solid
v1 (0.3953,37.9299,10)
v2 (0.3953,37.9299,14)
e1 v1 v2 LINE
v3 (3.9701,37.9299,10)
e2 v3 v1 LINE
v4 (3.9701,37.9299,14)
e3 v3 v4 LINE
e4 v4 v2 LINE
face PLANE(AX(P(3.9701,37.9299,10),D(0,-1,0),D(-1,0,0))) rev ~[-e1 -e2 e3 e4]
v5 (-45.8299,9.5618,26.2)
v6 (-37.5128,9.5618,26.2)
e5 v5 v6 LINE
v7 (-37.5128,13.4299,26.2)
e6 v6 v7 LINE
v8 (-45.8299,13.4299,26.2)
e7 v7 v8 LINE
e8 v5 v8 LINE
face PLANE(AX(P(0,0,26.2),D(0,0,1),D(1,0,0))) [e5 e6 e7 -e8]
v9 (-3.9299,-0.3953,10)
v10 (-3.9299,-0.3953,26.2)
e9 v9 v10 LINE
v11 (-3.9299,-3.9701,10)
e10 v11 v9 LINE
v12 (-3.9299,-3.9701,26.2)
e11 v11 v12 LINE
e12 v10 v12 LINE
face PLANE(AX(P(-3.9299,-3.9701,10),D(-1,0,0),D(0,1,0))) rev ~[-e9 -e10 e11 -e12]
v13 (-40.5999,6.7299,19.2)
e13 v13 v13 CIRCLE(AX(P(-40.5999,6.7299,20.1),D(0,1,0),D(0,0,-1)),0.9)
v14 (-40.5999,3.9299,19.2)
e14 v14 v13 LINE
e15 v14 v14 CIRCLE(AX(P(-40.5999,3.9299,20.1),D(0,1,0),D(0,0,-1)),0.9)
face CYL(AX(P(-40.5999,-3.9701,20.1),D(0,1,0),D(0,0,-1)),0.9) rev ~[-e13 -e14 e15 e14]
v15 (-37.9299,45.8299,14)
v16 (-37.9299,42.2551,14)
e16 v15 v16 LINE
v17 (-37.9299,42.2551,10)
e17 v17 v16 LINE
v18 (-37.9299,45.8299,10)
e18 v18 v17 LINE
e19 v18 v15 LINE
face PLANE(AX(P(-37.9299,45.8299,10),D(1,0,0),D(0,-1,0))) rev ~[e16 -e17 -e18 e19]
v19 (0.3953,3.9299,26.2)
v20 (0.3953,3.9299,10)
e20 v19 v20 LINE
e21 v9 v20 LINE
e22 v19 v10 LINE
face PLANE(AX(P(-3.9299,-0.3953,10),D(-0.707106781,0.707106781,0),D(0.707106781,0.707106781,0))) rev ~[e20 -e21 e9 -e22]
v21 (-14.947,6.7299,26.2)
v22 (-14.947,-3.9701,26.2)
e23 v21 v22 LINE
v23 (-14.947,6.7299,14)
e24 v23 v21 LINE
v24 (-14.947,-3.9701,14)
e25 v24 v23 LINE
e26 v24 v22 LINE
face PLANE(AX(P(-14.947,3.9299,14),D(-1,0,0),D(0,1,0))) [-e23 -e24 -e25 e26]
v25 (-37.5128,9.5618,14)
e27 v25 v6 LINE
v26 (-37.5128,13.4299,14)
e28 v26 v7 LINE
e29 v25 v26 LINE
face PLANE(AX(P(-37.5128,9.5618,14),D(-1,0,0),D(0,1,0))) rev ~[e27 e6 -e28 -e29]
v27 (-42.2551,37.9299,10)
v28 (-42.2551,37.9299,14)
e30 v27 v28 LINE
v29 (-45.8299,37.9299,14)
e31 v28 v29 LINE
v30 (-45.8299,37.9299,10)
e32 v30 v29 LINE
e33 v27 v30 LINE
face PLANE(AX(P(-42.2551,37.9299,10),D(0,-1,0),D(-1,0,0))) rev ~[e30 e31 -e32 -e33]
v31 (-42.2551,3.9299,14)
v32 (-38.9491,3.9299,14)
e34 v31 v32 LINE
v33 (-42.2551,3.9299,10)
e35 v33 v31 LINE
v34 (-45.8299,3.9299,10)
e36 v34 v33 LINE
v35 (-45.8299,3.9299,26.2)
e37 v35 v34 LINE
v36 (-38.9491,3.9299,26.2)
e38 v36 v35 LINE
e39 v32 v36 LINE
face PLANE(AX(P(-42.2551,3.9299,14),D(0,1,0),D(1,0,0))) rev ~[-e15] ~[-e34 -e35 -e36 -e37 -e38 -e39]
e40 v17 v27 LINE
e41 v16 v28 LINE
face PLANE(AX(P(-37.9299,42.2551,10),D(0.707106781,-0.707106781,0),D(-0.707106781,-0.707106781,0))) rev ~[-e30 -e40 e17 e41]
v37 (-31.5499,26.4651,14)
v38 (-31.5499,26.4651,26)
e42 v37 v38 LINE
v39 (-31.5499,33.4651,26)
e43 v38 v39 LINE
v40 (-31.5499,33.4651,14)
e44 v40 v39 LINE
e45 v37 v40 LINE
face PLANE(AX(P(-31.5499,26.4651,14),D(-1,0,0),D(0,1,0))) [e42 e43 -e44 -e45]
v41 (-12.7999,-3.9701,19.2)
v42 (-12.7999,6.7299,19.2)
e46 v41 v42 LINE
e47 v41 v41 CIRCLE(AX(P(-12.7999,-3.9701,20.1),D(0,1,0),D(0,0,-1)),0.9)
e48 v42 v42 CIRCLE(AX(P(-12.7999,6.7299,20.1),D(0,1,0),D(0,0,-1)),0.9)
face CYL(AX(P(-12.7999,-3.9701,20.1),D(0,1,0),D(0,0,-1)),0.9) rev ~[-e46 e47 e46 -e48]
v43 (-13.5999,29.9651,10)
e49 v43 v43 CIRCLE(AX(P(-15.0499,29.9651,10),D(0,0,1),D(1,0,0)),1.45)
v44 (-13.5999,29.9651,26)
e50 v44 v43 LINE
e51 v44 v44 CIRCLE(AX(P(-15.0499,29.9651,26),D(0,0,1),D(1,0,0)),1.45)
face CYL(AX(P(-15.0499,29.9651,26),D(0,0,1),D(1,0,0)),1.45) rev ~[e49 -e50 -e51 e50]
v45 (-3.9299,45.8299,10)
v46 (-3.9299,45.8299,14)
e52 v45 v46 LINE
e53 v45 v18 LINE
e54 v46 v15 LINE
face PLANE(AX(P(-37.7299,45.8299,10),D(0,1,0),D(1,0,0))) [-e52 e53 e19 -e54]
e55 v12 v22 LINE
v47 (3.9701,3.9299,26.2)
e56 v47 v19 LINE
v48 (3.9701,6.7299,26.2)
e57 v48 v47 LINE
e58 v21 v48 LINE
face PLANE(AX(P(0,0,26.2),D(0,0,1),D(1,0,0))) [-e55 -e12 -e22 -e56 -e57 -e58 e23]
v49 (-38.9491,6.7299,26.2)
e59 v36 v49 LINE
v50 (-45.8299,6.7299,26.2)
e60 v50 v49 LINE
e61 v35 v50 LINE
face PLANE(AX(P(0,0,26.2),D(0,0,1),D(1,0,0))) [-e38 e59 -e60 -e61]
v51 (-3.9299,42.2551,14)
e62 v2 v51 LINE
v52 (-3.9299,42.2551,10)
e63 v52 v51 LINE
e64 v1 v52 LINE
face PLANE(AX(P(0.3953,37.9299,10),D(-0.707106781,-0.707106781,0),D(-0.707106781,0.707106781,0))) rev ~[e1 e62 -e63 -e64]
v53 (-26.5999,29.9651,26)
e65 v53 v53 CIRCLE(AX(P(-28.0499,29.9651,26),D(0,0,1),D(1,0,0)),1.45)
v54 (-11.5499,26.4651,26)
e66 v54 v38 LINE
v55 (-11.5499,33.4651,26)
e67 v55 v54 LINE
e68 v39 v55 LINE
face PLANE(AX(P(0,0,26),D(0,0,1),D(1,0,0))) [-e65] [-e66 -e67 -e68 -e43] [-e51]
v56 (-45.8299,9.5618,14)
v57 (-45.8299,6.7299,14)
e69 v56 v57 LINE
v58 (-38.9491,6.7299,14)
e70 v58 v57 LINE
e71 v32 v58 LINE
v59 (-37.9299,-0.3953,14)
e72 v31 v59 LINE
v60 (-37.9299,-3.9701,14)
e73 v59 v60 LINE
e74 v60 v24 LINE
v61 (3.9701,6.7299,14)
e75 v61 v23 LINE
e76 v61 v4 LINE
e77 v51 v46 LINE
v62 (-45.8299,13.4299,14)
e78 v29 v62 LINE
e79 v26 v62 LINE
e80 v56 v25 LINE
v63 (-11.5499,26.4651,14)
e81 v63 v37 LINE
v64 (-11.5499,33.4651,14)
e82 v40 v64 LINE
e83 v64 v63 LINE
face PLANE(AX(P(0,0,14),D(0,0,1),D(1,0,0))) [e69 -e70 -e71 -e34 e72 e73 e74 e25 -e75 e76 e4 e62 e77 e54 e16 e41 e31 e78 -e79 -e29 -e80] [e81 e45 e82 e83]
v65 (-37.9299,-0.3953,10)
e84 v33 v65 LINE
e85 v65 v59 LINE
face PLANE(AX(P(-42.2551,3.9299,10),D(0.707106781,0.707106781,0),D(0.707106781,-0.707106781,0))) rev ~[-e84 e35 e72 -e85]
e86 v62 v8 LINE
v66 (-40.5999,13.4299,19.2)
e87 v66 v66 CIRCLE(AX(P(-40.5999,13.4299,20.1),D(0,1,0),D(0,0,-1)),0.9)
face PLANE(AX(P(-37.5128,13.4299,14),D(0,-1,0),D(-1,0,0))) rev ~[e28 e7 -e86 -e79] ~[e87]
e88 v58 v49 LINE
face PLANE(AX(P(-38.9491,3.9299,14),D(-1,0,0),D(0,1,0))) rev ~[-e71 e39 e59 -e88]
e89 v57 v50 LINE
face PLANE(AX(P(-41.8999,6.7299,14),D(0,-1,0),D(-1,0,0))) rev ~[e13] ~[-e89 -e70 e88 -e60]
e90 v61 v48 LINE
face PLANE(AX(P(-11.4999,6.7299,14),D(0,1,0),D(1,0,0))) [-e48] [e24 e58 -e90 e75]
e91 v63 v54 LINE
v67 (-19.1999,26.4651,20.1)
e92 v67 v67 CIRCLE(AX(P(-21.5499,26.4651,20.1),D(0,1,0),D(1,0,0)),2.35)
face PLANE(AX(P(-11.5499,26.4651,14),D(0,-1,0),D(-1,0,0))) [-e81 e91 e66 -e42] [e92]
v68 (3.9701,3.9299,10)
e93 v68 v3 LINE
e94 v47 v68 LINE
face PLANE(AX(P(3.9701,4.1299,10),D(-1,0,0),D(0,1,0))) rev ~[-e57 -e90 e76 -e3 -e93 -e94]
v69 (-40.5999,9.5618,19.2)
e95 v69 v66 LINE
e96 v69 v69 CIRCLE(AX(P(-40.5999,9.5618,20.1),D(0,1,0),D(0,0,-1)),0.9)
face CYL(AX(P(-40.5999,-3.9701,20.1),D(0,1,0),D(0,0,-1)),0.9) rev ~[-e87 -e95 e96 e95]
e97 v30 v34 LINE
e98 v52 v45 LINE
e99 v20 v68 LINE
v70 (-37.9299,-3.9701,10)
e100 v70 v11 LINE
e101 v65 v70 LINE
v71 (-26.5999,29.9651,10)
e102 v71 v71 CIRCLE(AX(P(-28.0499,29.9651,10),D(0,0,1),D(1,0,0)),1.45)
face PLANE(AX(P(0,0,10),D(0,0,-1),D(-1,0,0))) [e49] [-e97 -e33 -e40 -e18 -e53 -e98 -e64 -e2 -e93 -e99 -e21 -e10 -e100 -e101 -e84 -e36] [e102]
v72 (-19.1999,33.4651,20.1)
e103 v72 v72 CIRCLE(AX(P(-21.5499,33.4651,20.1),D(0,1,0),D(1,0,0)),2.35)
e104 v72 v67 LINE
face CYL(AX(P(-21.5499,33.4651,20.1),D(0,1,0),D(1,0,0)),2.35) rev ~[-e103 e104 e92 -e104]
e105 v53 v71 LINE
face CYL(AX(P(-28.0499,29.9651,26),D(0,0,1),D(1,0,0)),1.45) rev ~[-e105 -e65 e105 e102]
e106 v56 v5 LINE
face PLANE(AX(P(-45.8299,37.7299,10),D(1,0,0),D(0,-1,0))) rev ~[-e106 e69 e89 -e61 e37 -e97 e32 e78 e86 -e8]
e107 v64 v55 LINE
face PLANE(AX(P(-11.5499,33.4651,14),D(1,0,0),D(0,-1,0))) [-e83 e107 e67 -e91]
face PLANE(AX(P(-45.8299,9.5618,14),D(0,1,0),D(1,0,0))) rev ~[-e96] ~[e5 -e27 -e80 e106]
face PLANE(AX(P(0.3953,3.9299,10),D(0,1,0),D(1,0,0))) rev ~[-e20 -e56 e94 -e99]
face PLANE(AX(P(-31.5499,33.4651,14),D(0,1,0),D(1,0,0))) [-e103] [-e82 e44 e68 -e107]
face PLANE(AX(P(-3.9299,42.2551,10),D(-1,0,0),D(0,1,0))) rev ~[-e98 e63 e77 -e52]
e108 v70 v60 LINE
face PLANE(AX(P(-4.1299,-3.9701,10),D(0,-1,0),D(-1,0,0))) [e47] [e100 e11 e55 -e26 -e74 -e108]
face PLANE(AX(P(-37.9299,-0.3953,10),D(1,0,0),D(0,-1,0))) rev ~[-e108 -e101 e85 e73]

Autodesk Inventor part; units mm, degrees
ref_plane "YZ Plane" through (0, 0, 0) normal (1, 0, 0) x (0, 1, 0)
ref_plane "Work Plane1" through (0, 0, 10) normal (0, 0, 1) x (1, 0, 0)
sketch "Sketch1" plane through (0, 0, 10) normal (0, 0, 1) x (1, 0, 0)
  line L0 (-4.0299, -0.3538) -> (-2.2322, 1.4439) construction
  arc A0 (-1.4439, 2.2322) -> (-2.2322, 1.4439) centre (-0.9299, 0.9299) ccw construction
  line L1 (-1.4439, 2.2322) -> (0.3538, 4.0299) construction
  line L2 (-37.8299, 42.2137) -> (-37.8299, 45.8299) construction
  line L3 (-37.8299, 45.8299) -> (-4.0299, 45.8299) construction
  line L4 (-4.0299, 45.8299) -> (-4.0299, 42.2137) construction
  line L5 (-4.0299, 4.0299) -> (0.3538, 4.0299) projected
  circle A1 centre (-20.9299, 20.9299) radius 17.5 construction
  line L6 (-20.9299, 58.9723) -> (17.1124, 20.9299) construction
  line L7 (17.1124, 20.9299) -> (-20.9299, -17.1124) construction
  line L8 (-20.9299, -17.1124) -> (-58.9723, 20.9299) construction
  line L9 (-58.9723, 20.9299) -> (-20.9299, 58.9723) construction
  line L10 (-20.9299, 58.9723) -> (-20.9299, -17.1124) construction
  line L11 (17.1124, 20.9299) -> (-58.9723, 20.9299) construction
  line L12 (-20.9299, 58.9723) -> (32.8701, 58.9723) construction
  line L13 (-43.2198, 43.4299) -> (1.7802, 43.4299) construction
  line L14 (1.7802, 43.4299) -> (1.7802, -1.5701) construction
  line L15 (1.7802, -1.5701) -> (-43.2198, -1.5701) construction
  line L16 (-43.2198, -1.5701) -> (-43.2198, 43.4299) construction
  line L17 (-43.2198, 5.1774) -> (-43.2198, 36.6824)
  line L18 (-43.2198, 36.6824) -> (-36.4723, 43.4299)
  line L19 (-36.4723, 43.4299) -> (-5.3876, 43.4299)
  line L20 (-5.3876, 43.4299) -> (1.7802, 36.2621)
  line L21 (1.7802, 36.2621) -> (1.7802, 5.5977)
  line L22 (1.7802, 5.5977) -> (-5.3876, -1.5701)
  line L23 (-5.3876, -1.5701) -> (-36.4723, -1.5701)
  line L24 (-36.4723, -1.5701) -> (-43.2198, 5.1774)
  line L25 (-4.0299, 42.2137) -> (-37.8299, 42.2137) projected
  line L26 (-4.0299, -0.3538) -> (-4.0299, 4.0299) projected
  circle A2 centre (-20.7198, 20.9299) radius 7.0417 construction
  arc A3 (-7.3745, 3.5) -> (-34.4854, 3.5) centre (-20.9299, 0) ccw construction
  arc A4 (-11.4668, 9.7661) -> (-30.4087, 10.1422) centre (-20.7198, 20.9299) ccw
  line L27 (-30.5806, 10.1422) -> (-30.4087, 10.1422)
  line L28 (-30.4087, 10.1422) -> (-30.4087, 1.6029)
  line L29 (-30.4087, 1.6029) -> (-11.4668, 1.6029)
  line L30 (-11.4668, 1.6029) -> (-11.4668, 9.7661)
  line L31 (-43.2198, 43.4299) -> (-10.4667, 10.6769) construction
  line L32 (-8.5595, 8.5517) -> (1.7802, -1.5701) construction
  line L33 (1.7802, 43.4299) -> (-25.699, 15.9507) construction
  line L34 (-30.9728, 10.6769) -> (-43.2198, -1.5701) construction
  point P0 (-37.8299, 4.0299)
  dimension "d18" = 53.8
  dimension "d19" = 45
  dimension "d20" = 53.8
  dimension "d21" = 45
  dimension "d22" = 45
  dimension "d68" = 29
extrude "Extrusion1" add sketch "Sketch1" along normal blind 4 contours L26 L22 L23 L24 L17 L18 L25 L20 L21 L5 | L5 L22 L26 | L25 L18 L19 L20 | L30 L29 L28 A4
sketch "Sketch3" plane through (0, 0, 10) normal (0, 0, -1) x (-1, 0, 0)
  line L0 (37.8299, -0.4701) -> (37.8299, 4.0299) construction
  line L1 (4.0299, 4.0299) -> (4.0299, -0.4701) construction
  line L2 (37.8299, -0.4701) -> (37.8299, 1.1886) construction
  line L3 (4.0299, -3.9701) -> (4.0299, -0.3538) construction
  line L4 (45.8299, 4.0299) -> (42.2137, 4.0299) construction
  line L5 (-0.3538, 4.0299) -> (-3.9701, 4.0299) construction
  line L6 (-3.9701, 37.8299) -> (-0.3538, 37.8299) construction
  line L7 (4.0299, 42.2137) -> (4.0299, 45.8299) construction
  line L8 (37.8299, 45.8299) -> (37.8299, 42.2137) construction
  line L9 (42.2137, 37.8299) -> (45.8299, 37.8299) construction
  line L10 (37.8299, 37.7299) -> (45.8299, 37.7299)
  line L11 (45.8299, 37.7299) -> (45.8299, 4.1299)
  line L12 (45.8299, 4.1299) -> (37.8299, 4.1299)
  line L13 (37.8299, 4.1299) -> (37.8299, 37.7299)
  line L14 (37.7299, 4.0299) -> (4.1299, 4.0299)
  line L15 (4.1299, 4.0299) -> (4.1299, -3.9701)
  line L16 (4.1299, -3.9701) -> (37.7299, -3.9701)
  line L17 (37.7299, -3.9701) -> (37.7299, 4.0299)
  line L18 (4.0299, 4.1299) -> (-3.9701, 4.1299)
  line L19 (-3.9701, 4.1299) -> (-3.9701, 37.7299)
  line L20 (-3.9701, 37.7299) -> (4.0299, 37.7299)
  line L21 (4.0299, 37.7299) -> (4.0299, 4.1299)
  line L22 (4.1299, 37.8299) -> (37.7299, 37.8299)
  line L23 (37.7299, 37.8299) -> (37.7299, 45.8299)
  line L24 (37.7299, 45.8299) -> (4.1299, 45.8299)
  line L25 (4.1299, 45.8299) -> (4.1299, 37.8299)
  point P0 (0, 0)
  dimension "d23" = 0.1
  dimension "d24" = 0.1
  dimension "d25" = 0.1
  dimension "d26" = 0.1
  dimension "d27" = 0.1
extrude "Extrusion3" add sketch "Sketch3" against normal up to surface (4 mm away)
sketch "Skizze12" plane through (0, 0, 10) normal (0, 0, -1) x (-1, 0, 0)
  line L0 (-0.3124, 4.1299) -> (4.1299, -0.3124) projected
  line L1 (4.1299, -0.3124) -> (4.1299, -3.9701) projected
  line L2 (4.1299, -3.9701) -> (37.7299, -3.9701) construction
  line L3 (37.7299, -3.9701) -> (37.7299, -0.3124) projected
  line L4 (37.7299, -0.3124) -> (42.1723, 4.1299) projected
  line L5 (45.8299, 4.1299) -> (42.1723, 4.1299) projected
  line L6 (45.8299, 37.7299) -> (45.8299, 4.1299) construction
  line L7 (42.1723, 37.7299) -> (45.8299, 37.7299) projected
  line L8 (42.1723, 37.7299) -> (37.7299, 42.1723) projected
  line L9 (37.7299, 42.1723) -> (37.7299, 45.8299) projected
  line L10 (37.7299, 45.8299) -> (4.1299, 45.8299) construction
  line L11 (4.1299, 45.8299) -> (4.1299, 42.1723) projected
  line L12 (4.1299, 42.1723) -> (-0.3124, 37.7299) projected
  line L13 (-3.9701, 37.7299) -> (-0.3124, 37.7299) projected
  line L14 (-3.9701, 4.1299) -> (-3.9701, 37.7299) construction
  line L15 (-0.3124, 4.1299) -> (-3.9701, 4.1299) projected
  line L16 (37.9299, -4.1701) -> (3.9299, -4.1701) construction
  line L17 (3.9299, -4.1701) -> (3.9299, -0.3953)
  line L18 (3.9299, -0.3953) -> (-0.3953, 3.9299)
  line L19 (-0.3953, 3.9299) -> (-4.1701, 3.9299)
  line L20 (-4.1701, 3.9299) -> (-4.1701, 37.9299) construction
  line L21 (-4.1701, 37.9299) -> (-0.3953, 37.9299)
  line L22 (-0.3953, 37.9299) -> (3.9299, 42.2551)
  line L23 (3.9299, 42.2551) -> (3.9299, 46.0299)
  line L24 (3.9299, 46.0299) -> (37.9299, 46.0299) construction
  line L25 (37.9299, 46.0299) -> (37.9299, 42.2551)
  line L26 (37.9299, 42.2551) -> (42.2551, 37.9299)
  line L27 (42.2551, 37.9299) -> (46.0299, 37.9299)
  line L28 (46.0299, 37.9299) -> (46.0299, 3.9299) construction
  line L29 (46.0299, 3.9299) -> (42.2551, 3.9299)
  line L30 (42.2551, 3.9299) -> (37.9299, -0.3953)
  line L31 (37.9299, -0.3953) -> (37.9299, -4.1701)
  line L32 (-3.9701, 37.7299) -> (-3.9701, 37.9299)
  line L33 (37.7299, 45.8299) -> (4.1299, 45.8299) projected
  line L34 (4.1299, 45.8299) -> (3.9299, 45.8299)
  line L35 (37.7299, 45.8299) -> (37.9299, 45.8299)
  line L36 (45.8299, 37.7299) -> (45.8299, 37.9299)
  line L37 (45.8299, 4.1299) -> (45.8299, 3.9299)
  line L38 (37.7299, -3.9701) -> (37.9299, -3.9701)
  line L39 (4.1299, -3.9701) -> (3.9299, -3.9701)
  line L40 (-3.9701, 4.1299) -> (-3.9701, 3.9299)
  point P0 (0, 0)
  dimension "d65" = 0.2
extrude "IM_offset" add sketch "Skizze12" against normal up to surface (4 mm away)
sketch "Sketch15" plane through (0, 0, 14) normal (0, 0, 1) x (1, 0, 0)
  line L0 (-16.2999, 13.4299) -> (-16.2999, 9.2299) projected
  line L1 (-16.2999, 13.4299) -> (-19.9879, 13.4299) projected
  line L2 (-21.5499, 13.4299) -> (-19.9879, 13.4299) projected
  line L3 (-23.112, 13.4299) -> (-21.5499, 13.4299) projected
  line L4 (-23.112, 13.4299) -> (-37.0999, 13.4299) projected
  line L5 (-37.0999, 13.4299) -> (-37.0999, 9.2299) projected
  line L6 (-41.8999, 9.2299) -> (-37.0999, 9.2299) projected
  line L7 (-41.8999, 9.2299) -> (-41.8999, 6.7299) projected
  line L8 (-41.8999, 6.7299) -> (-11.4999, 6.7299) projected
  line L9 (-11.4999, 9.2299) -> (-11.4999, 6.7299) projected
  line L10 (-16.2999, 9.2299) -> (-11.4999, 9.2299) projected
  line L11 (3.9701, 37.9299) -> (3.9701, 3.9299) projected
  line L12 (0.3953, 37.9299) -> (3.9701, 37.9299) projected
  line L13 (-3.9299, 42.2551) -> (0.3953, 37.9299) projected
  line L14 (-3.9299, 45.8299) -> (-3.9299, 42.2551) projected
  line L15 (-37.9299, 45.8299) -> (-3.9299, 45.8299) projected
  line L16 (-37.9299, 42.2551) -> (-37.9299, 45.8299) projected
  line L17 (-42.2551, 37.9299) -> (-37.9299, 42.2551) projected
  line L18 (-45.8299, 37.9299) -> (-42.2551, 37.9299) projected
  line L19 (-45.8299, 3.9299) -> (-45.8299, 37.9299) projected
  line L20 (-42.2551, 3.9299) -> (-45.8299, 3.9299) projected
  line L21 (-37.9299, -0.3953) -> (-42.2551, 3.9299) projected
  line L22 (-37.9299, -3.9701) -> (-37.9299, -0.3953) projected
  line L23 (-3.9299, -3.9701) -> (-37.9299, -3.9701) projected
  line L24 (-3.9299, -0.3953) -> (-3.9299, -3.9701) projected
  line L25 (0.3953, 3.9299) -> (-3.9299, -0.3953) projected
  line L26 (3.9701, 3.9299) -> (0.3953, 3.9299) projected
  line L27 (-45.8299, 3.9299) -> (-38.9491, 3.9299)
  line L28 (-38.9491, 3.9299) -> (-38.9491, 6.7299)
  line L29 (-38.9491, 6.7299) -> (-45.8299, 6.7299)
  line L30 (-45.8299, 6.7299) -> (-45.8299, 3.9299)
  line L31 (3.9701, 3.9299) -> (0.3953, 3.9299) projected
  line L32 (-14.947, 6.7299) -> (3.9701, 6.7299)
  line L33 (3.9701, 6.7299) -> (3.9701, 3.9299)
  line L34 (3.9701, 3.9299) -> (-14.947, 3.9299)
  line L35 (-14.947, 3.9299) -> (-14.947, 6.7299)
  line L36 (0.3953, 3.9299) -> (-3.9299, -0.3953)
  line L37 (-3.9299, -0.3953) -> (-3.9299, -3.9701)
  line L38 (-3.9299, -3.9701) -> (-37.9299, -3.9701) projected
  line L39 (-3.9299, -3.9701) -> (-14.947, -3.9701)
  line L40 (-14.947, 3.9299) -> (-14.947, -3.9701)
  line L41 (-45.8299, 3.9299) -> (-45.8299, 37.9299) projected
  line L42 (-45.8299, 9.5618) -> (-37.5128, 9.5618)
  line L43 (-37.5128, 9.5618) -> (-37.5128, 13.4299)
  line L44 (-37.5128, 13.4299) -> (-45.8299, 13.4299)
  line L45 (-45.8299, 13.4299) -> (-45.8299, 9.5618)
  point P0 (0, 0)
ref_plane "Work Plane4" through (-41.8999, 11.7299, 26.2) normal (0, 0, 1) x (1, 0, 0)
extrude "Extrusion13" add sketch "Sketch15" along normal up to surface (12.2 mm away) contours L32 L11 L26 L34 L35 L8 | L28 L27 L20 L19 L29 L8 | L34 L25 L24 L23 L40 | L19 L44 L43 L42
sketch "Sketch16" plane through (-45.8299, -3.9701, 10) normal (0, -1, 0) x (1, 0, 0)
  circle A0 centre (5.23, 10.1) radius 0.8388 projected
  circle A1 centre (5.23, 10.1) radius 1.5765 projected
  circle A2 centre (33.03, 10.1) radius 2.4 projected
  point P0 (45.8299, -10)
hole "Hole1" at (-40.5999, -3.9701, 20.1) at (-12.7999, -3.9701, 20.1) direction (0, 1, 0) diameter 1.8 end through all
sketch "Sketch17" plane through (0, 0, 14) normal (0, 0, 1) x (1, 0, 0)
  line L0 (-18.1603, 25.8799) -> (-22.3637, 25.8799) projected
  line L1 (-22.3637, 25.8799) -> (-47.0707, 25.8799) projected
  line L2 (-19.1999, 18.8799) -> (-19.1999, 25.8799)
  line L3 (-23.8999, 18.8799) -> (-23.8999, 25.8799)
  line L4 (-11.5499, 26.4651) -> (-31.5499, 26.4651)
  line L5 (-31.5499, 26.4651) -> (-31.5499, 33.4651)
  line L6 (-31.5499, 33.4651) -> (-11.5499, 33.4651)
  line L7 (-11.5499, 33.4651) -> (-11.5499, 26.4651)
  point P0 (0, 0)
  dimension "d82" = 20
  dimension "d83" = 7
  dimension "d84" = 7.65
extrude "Extrusion14" add sketch "Sketch17" along normal blind 12
sketch "Sketch18" plane through (-31.5499, 33.4651, 14) normal (0, 1, 0) x (1, 0, 0)
  circle A0 centre (10, -6.1) radius 2.35 projected
  point P0 (31.5499, 14)
extrude "Extrusion15" cut sketch "Sketch18" against normal blind 12
sketch "Sketch19" plane through (0, 0, 26) normal (0, 0, 1) x (1, 0, 0)
  line L0 (-31.5499, 26.4651) -> (-11.5499, 26.4651) projected
  line L1 (-11.5499, 26.4651) -> (-11.5499, 33.4651) projected
  line L2 (-11.5499, 33.4651) -> (-31.5499, 33.4651) projected
  line L3 (-31.5499, 33.4651) -> (-31.5499, 26.4651) projected
  circle A0 centre (-15.0499, 29.9651) radius 1.45
  circle A1 centre (-28.0499, 29.9651) radius 1.45
  point P0 (0, 0)
  dimension "d89" = 2.9
  dimension "d90" = 3.5
  dimension "d91" = 3.5
  dimension "d92" = 2.9
  dimension "d93" = 3.5
extrude "Extrusion16" cut sketch "Sketch19" against normal through all contours A0 | A1
sketch "Sketch20" plane through (0, 0, 26) normal (0, 0, 1) x (1, 0, 0)
  line L0 (-9.7781, 37.8674) -> (-41.4214, 37.8674)
  line L1 (-41.4214, 37.8674) -> (-41.4214, 22.8936)
  line L2 (-41.4214, 22.8936) -> (-9.7781, 22.8936)
  line L3 (-9.7781, 22.8936) -> (-9.7781, 37.8674)
  point P0 (0, 0)
properties part number "20_Cube_Insert_RaspiCam_v3"
